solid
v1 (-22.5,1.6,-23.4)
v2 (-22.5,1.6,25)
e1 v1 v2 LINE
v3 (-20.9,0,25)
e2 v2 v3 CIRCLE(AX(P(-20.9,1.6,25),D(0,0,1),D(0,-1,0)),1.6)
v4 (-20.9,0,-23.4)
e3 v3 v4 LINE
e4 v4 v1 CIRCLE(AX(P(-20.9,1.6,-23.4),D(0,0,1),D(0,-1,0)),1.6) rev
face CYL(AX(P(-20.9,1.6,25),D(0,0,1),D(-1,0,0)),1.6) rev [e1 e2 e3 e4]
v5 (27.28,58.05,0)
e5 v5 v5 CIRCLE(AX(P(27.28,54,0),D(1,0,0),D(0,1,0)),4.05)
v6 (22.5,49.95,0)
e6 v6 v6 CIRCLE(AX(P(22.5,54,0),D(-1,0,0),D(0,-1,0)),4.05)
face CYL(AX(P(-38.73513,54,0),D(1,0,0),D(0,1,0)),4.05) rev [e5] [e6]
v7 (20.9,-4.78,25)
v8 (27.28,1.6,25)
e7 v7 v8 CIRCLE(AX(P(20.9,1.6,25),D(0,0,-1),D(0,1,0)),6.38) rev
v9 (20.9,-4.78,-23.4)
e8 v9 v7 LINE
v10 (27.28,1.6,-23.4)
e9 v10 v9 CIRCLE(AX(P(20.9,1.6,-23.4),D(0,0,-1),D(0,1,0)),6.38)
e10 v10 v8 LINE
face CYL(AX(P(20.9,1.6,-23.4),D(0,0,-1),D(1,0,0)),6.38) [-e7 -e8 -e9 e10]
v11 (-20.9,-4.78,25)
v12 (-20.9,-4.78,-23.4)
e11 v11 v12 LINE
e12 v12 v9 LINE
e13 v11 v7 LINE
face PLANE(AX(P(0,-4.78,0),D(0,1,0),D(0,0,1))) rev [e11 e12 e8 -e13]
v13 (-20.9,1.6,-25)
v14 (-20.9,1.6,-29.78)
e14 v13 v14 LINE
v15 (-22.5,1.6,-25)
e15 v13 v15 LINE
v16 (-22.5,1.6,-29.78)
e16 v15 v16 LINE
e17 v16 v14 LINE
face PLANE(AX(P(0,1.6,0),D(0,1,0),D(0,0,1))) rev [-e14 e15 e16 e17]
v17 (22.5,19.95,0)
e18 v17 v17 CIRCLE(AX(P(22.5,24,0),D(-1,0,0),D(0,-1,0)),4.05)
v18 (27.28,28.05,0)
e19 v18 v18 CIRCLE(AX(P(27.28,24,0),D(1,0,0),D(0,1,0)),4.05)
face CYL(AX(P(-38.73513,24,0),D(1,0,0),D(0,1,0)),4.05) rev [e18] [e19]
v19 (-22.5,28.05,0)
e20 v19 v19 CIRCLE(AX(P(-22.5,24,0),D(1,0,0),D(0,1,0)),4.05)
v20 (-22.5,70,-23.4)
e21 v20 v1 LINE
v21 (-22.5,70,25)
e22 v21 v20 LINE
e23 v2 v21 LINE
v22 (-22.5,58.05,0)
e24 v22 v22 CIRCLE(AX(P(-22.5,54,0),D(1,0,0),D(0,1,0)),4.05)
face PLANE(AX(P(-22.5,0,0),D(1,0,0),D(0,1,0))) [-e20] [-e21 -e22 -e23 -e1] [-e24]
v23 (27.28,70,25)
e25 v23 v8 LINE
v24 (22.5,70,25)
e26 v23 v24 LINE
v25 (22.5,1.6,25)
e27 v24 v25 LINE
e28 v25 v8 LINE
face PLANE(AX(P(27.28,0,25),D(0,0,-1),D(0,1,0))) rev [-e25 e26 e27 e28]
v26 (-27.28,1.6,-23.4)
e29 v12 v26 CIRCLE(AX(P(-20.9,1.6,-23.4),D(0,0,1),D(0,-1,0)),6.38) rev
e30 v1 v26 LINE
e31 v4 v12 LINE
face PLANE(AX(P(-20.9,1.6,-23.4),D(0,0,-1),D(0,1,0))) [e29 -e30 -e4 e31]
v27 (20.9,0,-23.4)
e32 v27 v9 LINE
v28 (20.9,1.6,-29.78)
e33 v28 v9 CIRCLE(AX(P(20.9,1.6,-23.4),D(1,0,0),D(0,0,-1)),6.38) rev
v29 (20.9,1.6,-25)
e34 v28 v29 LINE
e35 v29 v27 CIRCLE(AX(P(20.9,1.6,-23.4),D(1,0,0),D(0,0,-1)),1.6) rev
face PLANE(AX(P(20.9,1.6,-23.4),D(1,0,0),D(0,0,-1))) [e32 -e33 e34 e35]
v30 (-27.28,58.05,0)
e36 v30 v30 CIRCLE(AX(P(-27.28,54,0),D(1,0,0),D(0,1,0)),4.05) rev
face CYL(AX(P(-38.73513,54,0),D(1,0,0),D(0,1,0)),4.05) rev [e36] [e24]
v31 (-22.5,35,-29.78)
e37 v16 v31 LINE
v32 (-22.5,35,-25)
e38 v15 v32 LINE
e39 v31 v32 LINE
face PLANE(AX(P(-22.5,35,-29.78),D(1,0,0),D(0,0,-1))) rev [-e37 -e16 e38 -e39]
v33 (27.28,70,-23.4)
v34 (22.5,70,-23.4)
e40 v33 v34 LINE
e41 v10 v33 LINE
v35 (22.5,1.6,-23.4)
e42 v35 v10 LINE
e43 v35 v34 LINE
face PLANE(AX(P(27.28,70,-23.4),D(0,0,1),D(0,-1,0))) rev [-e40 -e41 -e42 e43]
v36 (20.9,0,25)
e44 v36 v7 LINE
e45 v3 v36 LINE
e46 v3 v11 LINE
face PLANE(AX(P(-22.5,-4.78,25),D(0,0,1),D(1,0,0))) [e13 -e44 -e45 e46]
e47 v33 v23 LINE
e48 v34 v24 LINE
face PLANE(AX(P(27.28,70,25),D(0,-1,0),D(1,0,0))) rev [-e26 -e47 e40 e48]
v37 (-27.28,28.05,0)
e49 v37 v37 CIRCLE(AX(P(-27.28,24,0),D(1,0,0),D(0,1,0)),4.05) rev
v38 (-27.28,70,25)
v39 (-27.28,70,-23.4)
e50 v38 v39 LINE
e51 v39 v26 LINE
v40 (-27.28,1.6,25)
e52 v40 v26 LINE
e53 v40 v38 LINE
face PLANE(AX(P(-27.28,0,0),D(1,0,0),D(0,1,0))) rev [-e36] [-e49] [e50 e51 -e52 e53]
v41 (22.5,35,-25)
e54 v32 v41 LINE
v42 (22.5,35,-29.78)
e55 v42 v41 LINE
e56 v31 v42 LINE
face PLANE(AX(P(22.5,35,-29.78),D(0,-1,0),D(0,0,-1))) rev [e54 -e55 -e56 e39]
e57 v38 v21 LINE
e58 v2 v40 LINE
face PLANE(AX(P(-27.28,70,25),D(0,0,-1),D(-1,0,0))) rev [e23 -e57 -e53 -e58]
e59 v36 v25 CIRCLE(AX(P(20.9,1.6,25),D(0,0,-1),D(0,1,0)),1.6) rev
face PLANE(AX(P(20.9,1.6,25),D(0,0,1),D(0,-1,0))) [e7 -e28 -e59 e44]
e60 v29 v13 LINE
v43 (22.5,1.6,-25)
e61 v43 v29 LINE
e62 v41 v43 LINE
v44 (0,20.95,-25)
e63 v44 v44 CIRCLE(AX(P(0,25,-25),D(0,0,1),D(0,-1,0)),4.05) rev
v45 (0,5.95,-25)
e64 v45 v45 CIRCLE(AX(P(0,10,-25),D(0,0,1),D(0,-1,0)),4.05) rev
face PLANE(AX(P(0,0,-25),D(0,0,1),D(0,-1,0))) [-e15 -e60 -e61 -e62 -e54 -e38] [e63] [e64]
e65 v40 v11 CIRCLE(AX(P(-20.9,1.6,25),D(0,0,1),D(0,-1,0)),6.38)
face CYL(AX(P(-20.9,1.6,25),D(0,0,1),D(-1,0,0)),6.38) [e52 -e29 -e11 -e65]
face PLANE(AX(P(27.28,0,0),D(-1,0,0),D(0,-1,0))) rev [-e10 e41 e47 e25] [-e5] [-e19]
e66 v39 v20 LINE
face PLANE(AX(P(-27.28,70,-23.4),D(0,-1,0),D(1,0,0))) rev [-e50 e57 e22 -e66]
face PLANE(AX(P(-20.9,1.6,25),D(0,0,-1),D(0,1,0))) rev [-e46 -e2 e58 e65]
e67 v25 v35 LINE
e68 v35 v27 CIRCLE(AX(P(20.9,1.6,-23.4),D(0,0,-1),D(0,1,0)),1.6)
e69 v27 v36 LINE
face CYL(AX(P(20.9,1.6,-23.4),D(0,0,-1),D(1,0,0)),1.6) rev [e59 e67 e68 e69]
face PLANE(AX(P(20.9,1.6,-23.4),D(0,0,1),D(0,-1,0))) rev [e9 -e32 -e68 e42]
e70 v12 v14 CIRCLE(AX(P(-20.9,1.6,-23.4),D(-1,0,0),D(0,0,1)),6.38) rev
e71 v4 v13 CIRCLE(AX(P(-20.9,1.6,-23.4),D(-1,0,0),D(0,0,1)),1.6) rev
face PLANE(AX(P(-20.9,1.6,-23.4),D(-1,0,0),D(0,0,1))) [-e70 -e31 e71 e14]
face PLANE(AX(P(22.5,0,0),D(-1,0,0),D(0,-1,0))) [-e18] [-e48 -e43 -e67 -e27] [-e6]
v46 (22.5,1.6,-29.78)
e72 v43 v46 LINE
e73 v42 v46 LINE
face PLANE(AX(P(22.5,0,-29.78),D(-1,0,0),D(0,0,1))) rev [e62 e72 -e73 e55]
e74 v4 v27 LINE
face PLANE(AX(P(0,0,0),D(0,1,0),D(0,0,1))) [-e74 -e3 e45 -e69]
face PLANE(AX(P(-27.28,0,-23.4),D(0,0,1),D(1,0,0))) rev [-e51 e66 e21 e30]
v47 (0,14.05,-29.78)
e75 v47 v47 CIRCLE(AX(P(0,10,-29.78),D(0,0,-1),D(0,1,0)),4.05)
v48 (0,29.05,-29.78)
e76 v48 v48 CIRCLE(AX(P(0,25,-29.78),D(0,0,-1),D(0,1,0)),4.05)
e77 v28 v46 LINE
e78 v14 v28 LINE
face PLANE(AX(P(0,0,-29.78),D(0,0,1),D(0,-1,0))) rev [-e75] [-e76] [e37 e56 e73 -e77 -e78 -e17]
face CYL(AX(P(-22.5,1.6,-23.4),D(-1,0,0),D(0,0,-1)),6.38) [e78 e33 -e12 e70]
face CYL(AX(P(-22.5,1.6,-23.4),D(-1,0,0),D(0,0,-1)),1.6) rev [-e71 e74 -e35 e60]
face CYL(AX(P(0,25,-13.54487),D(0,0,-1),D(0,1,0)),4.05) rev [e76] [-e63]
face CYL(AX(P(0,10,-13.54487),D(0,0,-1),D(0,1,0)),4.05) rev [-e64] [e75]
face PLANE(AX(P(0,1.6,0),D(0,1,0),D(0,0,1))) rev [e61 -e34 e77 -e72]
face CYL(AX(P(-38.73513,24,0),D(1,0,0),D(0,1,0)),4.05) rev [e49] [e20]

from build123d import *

# Parameters (mm, degrees)
SKETCH2_W                    = 45
SKETCH2_H                    = 50
BASE_FLANGE1_DEPTH           = 4.78
EDGE_FLANGE1_STRIP_W         = 22.32
EDGE_FLANGE1_STRIP_H         = 4.78
EDGE_FLANGE1_STRIP_CUT_DEPTH = 45
EDGE_FLANGE1_DEPTH           = 45
EDGE_FLANGE2_START           = -29.78
EDGE_FLANGE2_OUTLINE_W       = 1.6
EDGE_FLANGE2_OUTLINE_H       = 6.38
EDGE_FLANGE2_DEPTH           = 6.38
EDGE_FLANGE2_START_2         = -23.4
EDGE_FLANGE2_2_DEPTH         = 48.4
EDGE_FLANGE2_3_DEPTH         = 48.4
CUT_EXTRUDE1_REACH           = 95.614
SKETCH23_R                   = 4.05
SKETCH24_R                   = 4.05
CUT_EXTRUDE2_DEPTH           = 4.78


# Read off the part's stored shape, not the designer's step: Edge-Flange2
# Sheet-metal steps are written as plain solids
with BuildPart() as part:
    # Sketch2 → Base-Flange1 (new body)
    with BuildSketch(Plane(origin=(0, 0, 0), x_dir=(1, 0, 0), z_dir=(0, 1, 0))):
        Rectangle(SKETCH2_W, SKETCH2_H)
    extrude(amount=-BASE_FLANGE1_DEPTH)

    # Edge-Flange1 strip (across the edge) → Edge-Flange1 strip cut (cut)
    with BuildSketch(Plane(origin=(22.5, 0, -25), x_dir=(0, 0, 1), z_dir=(-1, 0, 0))):
        with Locations((-9.56, -2.39)):
            Rectangle(EDGE_FLANGE1_STRIP_W, EDGE_FLANGE1_STRIP_H)
    extrude(amount=EDGE_FLANGE1_STRIP_CUT_DEPTH, mode=Mode.SUBTRACT)

    # Edge-Flange1 section (across the edge) → Edge-Flange1 (add)
    with BuildSketch(Plane(origin=(22.5, 0, -25), x_dir=(0, 0, 1), z_dir=(-1, 0, 0))):
        with BuildLine():
            Line((-4.78, 1.6), (-4.78, 35))
            Line((-4.78, 35), (0, 35))
            Line((0, 35), (0, 1.6))
            ThreePointArc((0, 1.6), (0.46862915, 0.46862915), (1.6, 0))
            Line((1.6, 0), (1.6, -4.78))
            ThreePointArc((1.6, -4.78), (-2.911341264, -2.911341264), (-4.78, 1.6))
        make_face()
    extrude(amount=EDGE_FLANGE1_DEPTH)

    # Edge-Flange2 outline → Edge-Flange2 (cut)
    with BuildSketch(Plane.XY.offset(EDGE_FLANGE2_START)):
        with Locations((-21.7, -1.59)):
            Rectangle(EDGE_FLANGE2_OUTLINE_W, EDGE_FLANGE2_OUTLINE_H)
        with Locations((21.7, -1.59)):
            Rectangle(EDGE_FLANGE2_OUTLINE_W, EDGE_FLANGE2_OUTLINE_H)
    extrude(amount=EDGE_FLANGE2_DEPTH, mode=Mode.SUBTRACT)

    # Edge-Flange2 2 outline → Edge-Flange2 2 (cut)
    with BuildSketch(Plane.XY.offset(EDGE_FLANGE2_START_2)):
        with BuildLine():
            Line((-22.5, -4.78), (-20.9, -4.78))
            ThreePointArc((-20.9, -4.78), (-21.706468998, -4.728823568), (-22.5, -4.576115284))
            Line((-22.5, -4.576115284), (-22.5, -4.78))
        make_face()
        with BuildLine():
            ThreePointArc((22.5, -4.576115284), (21.706468998, -4.728823568), (20.9, -4.78))
            Line((20.9, -4.78), (22.5, -4.78))
            Line((22.5, -4.78), (22.5, -4.576115284))
        make_face()
    extrude(amount=EDGE_FLANGE2_2_DEPTH, mode=Mode.SUBTRACT)

    # Edge-Flange2 3 outline → Edge-Flange2 3 (add)
    with BuildSketch(Plane.XY.offset(EDGE_FLANGE2_START_2)):
        with BuildLine():
            Line((-22.5, -4.576115284), (-22.5, 0))
            Line((-22.5, 0), (-20.9, 0))
            ThreePointArc((-20.9, 0), (-22.03137085, 0.46862915), (-22.5, 1.6))
            Line((-22.5, 1.6), (-22.5, 70))
            Line((-22.5, 70), (-27.28, 70))
            Line((-27.28, 70), (-27.28, 1.6))
            ThreePointArc((-27.28, 1.6), (-25.945413759, -2.304894365), (-22.5, -4.576115284))
        make_face()
        with BuildLine():
            ThreePointArc((22.5, 1.6), (22.03137085, 0.46862915), (20.9, 0))
            Line((20.9, 0), (22.5, 0))
            Line((22.5, 0), (22.5, -4.576115284))
            ThreePointArc((22.5, -4.576115284), (25.945413759, -2.304894365), (27.28, 1.6))
            Line((27.28, 1.6), (27.28, 70))
            Line((27.28, 70), (22.5, 70))
            Line((22.5, 70), (22.5, 1.6))
        make_face()
    extrude(amount=EDGE_FLANGE2_3_DEPTH)

    # Cut-Extrude1: up to this face of the body (flat: up to its plane)
    cut_extrude1_end = Plane(part.part.faces().sort_by_distance((-27.28, 35.8, 0.8))[0])
    # Sketch23 → Cut-Extrude1 (cut, up to the picked face)
    with BuildSketch(Plane(origin=(27.28, 0, 0), x_dir=(0, 0, -1), z_dir=(1, 0, 0)), mode=Mode.PRIVATE) as cut_extrude1_sk1:
        with Locations(Location((0, 54, 0), (0, 0, 90))):
            Circle(SKETCH23_R)
    cut_extrude1_tool1 = split(extrude(cut_extrude1_sk1.sketch, amount=-CUT_EXTRUDE1_REACH, mode=Mode.PRIVATE), bisect_by=cut_extrude1_end, keep=Keep.BOTH, mode=Mode.PRIVATE)
    # Sketch23 → Cut-Extrude1 (cut, up to the picked face)
    with BuildSketch(Plane(origin=(27.28, 0, 0), x_dir=(0, 0, -1), z_dir=(1, 0, 0)), mode=Mode.PRIVATE) as cut_extrude1_sk2:
        with Locations(Location((0, 24, 0), (0, 0, 90))):
            Circle(SKETCH23_R)
    cut_extrude1_tool2 = split(extrude(cut_extrude1_sk2.sketch, amount=-CUT_EXTRUDE1_REACH, mode=Mode.PRIVATE), bisect_by=cut_extrude1_end, keep=Keep.BOTH, mode=Mode.PRIVATE)
    add(cut_extrude1_tool1.solids().sort_by(Axis((27.28, 54, 0), (-1, 0, 0)))[0], mode=Mode.SUBTRACT)
    add(cut_extrude1_tool2.solids().sort_by(Axis((27.28, 24, 0), (-1, 0, 0)))[0], mode=Mode.SUBTRACT)

    # Sketch24 → Cut-Extrude2 (cut)
    with BuildSketch(Plane(origin=(0, 0, -29.78), x_dir=(-1, 0, 0), z_dir=(0, 0, -1))):
        with Locations(Location((0, 25, 0), (0, 0, 90))):
            Circle(SKETCH24_R)
        with Locations(Location((0, 10, 0), (0, 0, 90))):
            Circle(SKETCH24_R)
    extrude(amount=-CUT_EXTRUDE2_DEPTH, mode=Mode.SUBTRACT)


solid = part.part
